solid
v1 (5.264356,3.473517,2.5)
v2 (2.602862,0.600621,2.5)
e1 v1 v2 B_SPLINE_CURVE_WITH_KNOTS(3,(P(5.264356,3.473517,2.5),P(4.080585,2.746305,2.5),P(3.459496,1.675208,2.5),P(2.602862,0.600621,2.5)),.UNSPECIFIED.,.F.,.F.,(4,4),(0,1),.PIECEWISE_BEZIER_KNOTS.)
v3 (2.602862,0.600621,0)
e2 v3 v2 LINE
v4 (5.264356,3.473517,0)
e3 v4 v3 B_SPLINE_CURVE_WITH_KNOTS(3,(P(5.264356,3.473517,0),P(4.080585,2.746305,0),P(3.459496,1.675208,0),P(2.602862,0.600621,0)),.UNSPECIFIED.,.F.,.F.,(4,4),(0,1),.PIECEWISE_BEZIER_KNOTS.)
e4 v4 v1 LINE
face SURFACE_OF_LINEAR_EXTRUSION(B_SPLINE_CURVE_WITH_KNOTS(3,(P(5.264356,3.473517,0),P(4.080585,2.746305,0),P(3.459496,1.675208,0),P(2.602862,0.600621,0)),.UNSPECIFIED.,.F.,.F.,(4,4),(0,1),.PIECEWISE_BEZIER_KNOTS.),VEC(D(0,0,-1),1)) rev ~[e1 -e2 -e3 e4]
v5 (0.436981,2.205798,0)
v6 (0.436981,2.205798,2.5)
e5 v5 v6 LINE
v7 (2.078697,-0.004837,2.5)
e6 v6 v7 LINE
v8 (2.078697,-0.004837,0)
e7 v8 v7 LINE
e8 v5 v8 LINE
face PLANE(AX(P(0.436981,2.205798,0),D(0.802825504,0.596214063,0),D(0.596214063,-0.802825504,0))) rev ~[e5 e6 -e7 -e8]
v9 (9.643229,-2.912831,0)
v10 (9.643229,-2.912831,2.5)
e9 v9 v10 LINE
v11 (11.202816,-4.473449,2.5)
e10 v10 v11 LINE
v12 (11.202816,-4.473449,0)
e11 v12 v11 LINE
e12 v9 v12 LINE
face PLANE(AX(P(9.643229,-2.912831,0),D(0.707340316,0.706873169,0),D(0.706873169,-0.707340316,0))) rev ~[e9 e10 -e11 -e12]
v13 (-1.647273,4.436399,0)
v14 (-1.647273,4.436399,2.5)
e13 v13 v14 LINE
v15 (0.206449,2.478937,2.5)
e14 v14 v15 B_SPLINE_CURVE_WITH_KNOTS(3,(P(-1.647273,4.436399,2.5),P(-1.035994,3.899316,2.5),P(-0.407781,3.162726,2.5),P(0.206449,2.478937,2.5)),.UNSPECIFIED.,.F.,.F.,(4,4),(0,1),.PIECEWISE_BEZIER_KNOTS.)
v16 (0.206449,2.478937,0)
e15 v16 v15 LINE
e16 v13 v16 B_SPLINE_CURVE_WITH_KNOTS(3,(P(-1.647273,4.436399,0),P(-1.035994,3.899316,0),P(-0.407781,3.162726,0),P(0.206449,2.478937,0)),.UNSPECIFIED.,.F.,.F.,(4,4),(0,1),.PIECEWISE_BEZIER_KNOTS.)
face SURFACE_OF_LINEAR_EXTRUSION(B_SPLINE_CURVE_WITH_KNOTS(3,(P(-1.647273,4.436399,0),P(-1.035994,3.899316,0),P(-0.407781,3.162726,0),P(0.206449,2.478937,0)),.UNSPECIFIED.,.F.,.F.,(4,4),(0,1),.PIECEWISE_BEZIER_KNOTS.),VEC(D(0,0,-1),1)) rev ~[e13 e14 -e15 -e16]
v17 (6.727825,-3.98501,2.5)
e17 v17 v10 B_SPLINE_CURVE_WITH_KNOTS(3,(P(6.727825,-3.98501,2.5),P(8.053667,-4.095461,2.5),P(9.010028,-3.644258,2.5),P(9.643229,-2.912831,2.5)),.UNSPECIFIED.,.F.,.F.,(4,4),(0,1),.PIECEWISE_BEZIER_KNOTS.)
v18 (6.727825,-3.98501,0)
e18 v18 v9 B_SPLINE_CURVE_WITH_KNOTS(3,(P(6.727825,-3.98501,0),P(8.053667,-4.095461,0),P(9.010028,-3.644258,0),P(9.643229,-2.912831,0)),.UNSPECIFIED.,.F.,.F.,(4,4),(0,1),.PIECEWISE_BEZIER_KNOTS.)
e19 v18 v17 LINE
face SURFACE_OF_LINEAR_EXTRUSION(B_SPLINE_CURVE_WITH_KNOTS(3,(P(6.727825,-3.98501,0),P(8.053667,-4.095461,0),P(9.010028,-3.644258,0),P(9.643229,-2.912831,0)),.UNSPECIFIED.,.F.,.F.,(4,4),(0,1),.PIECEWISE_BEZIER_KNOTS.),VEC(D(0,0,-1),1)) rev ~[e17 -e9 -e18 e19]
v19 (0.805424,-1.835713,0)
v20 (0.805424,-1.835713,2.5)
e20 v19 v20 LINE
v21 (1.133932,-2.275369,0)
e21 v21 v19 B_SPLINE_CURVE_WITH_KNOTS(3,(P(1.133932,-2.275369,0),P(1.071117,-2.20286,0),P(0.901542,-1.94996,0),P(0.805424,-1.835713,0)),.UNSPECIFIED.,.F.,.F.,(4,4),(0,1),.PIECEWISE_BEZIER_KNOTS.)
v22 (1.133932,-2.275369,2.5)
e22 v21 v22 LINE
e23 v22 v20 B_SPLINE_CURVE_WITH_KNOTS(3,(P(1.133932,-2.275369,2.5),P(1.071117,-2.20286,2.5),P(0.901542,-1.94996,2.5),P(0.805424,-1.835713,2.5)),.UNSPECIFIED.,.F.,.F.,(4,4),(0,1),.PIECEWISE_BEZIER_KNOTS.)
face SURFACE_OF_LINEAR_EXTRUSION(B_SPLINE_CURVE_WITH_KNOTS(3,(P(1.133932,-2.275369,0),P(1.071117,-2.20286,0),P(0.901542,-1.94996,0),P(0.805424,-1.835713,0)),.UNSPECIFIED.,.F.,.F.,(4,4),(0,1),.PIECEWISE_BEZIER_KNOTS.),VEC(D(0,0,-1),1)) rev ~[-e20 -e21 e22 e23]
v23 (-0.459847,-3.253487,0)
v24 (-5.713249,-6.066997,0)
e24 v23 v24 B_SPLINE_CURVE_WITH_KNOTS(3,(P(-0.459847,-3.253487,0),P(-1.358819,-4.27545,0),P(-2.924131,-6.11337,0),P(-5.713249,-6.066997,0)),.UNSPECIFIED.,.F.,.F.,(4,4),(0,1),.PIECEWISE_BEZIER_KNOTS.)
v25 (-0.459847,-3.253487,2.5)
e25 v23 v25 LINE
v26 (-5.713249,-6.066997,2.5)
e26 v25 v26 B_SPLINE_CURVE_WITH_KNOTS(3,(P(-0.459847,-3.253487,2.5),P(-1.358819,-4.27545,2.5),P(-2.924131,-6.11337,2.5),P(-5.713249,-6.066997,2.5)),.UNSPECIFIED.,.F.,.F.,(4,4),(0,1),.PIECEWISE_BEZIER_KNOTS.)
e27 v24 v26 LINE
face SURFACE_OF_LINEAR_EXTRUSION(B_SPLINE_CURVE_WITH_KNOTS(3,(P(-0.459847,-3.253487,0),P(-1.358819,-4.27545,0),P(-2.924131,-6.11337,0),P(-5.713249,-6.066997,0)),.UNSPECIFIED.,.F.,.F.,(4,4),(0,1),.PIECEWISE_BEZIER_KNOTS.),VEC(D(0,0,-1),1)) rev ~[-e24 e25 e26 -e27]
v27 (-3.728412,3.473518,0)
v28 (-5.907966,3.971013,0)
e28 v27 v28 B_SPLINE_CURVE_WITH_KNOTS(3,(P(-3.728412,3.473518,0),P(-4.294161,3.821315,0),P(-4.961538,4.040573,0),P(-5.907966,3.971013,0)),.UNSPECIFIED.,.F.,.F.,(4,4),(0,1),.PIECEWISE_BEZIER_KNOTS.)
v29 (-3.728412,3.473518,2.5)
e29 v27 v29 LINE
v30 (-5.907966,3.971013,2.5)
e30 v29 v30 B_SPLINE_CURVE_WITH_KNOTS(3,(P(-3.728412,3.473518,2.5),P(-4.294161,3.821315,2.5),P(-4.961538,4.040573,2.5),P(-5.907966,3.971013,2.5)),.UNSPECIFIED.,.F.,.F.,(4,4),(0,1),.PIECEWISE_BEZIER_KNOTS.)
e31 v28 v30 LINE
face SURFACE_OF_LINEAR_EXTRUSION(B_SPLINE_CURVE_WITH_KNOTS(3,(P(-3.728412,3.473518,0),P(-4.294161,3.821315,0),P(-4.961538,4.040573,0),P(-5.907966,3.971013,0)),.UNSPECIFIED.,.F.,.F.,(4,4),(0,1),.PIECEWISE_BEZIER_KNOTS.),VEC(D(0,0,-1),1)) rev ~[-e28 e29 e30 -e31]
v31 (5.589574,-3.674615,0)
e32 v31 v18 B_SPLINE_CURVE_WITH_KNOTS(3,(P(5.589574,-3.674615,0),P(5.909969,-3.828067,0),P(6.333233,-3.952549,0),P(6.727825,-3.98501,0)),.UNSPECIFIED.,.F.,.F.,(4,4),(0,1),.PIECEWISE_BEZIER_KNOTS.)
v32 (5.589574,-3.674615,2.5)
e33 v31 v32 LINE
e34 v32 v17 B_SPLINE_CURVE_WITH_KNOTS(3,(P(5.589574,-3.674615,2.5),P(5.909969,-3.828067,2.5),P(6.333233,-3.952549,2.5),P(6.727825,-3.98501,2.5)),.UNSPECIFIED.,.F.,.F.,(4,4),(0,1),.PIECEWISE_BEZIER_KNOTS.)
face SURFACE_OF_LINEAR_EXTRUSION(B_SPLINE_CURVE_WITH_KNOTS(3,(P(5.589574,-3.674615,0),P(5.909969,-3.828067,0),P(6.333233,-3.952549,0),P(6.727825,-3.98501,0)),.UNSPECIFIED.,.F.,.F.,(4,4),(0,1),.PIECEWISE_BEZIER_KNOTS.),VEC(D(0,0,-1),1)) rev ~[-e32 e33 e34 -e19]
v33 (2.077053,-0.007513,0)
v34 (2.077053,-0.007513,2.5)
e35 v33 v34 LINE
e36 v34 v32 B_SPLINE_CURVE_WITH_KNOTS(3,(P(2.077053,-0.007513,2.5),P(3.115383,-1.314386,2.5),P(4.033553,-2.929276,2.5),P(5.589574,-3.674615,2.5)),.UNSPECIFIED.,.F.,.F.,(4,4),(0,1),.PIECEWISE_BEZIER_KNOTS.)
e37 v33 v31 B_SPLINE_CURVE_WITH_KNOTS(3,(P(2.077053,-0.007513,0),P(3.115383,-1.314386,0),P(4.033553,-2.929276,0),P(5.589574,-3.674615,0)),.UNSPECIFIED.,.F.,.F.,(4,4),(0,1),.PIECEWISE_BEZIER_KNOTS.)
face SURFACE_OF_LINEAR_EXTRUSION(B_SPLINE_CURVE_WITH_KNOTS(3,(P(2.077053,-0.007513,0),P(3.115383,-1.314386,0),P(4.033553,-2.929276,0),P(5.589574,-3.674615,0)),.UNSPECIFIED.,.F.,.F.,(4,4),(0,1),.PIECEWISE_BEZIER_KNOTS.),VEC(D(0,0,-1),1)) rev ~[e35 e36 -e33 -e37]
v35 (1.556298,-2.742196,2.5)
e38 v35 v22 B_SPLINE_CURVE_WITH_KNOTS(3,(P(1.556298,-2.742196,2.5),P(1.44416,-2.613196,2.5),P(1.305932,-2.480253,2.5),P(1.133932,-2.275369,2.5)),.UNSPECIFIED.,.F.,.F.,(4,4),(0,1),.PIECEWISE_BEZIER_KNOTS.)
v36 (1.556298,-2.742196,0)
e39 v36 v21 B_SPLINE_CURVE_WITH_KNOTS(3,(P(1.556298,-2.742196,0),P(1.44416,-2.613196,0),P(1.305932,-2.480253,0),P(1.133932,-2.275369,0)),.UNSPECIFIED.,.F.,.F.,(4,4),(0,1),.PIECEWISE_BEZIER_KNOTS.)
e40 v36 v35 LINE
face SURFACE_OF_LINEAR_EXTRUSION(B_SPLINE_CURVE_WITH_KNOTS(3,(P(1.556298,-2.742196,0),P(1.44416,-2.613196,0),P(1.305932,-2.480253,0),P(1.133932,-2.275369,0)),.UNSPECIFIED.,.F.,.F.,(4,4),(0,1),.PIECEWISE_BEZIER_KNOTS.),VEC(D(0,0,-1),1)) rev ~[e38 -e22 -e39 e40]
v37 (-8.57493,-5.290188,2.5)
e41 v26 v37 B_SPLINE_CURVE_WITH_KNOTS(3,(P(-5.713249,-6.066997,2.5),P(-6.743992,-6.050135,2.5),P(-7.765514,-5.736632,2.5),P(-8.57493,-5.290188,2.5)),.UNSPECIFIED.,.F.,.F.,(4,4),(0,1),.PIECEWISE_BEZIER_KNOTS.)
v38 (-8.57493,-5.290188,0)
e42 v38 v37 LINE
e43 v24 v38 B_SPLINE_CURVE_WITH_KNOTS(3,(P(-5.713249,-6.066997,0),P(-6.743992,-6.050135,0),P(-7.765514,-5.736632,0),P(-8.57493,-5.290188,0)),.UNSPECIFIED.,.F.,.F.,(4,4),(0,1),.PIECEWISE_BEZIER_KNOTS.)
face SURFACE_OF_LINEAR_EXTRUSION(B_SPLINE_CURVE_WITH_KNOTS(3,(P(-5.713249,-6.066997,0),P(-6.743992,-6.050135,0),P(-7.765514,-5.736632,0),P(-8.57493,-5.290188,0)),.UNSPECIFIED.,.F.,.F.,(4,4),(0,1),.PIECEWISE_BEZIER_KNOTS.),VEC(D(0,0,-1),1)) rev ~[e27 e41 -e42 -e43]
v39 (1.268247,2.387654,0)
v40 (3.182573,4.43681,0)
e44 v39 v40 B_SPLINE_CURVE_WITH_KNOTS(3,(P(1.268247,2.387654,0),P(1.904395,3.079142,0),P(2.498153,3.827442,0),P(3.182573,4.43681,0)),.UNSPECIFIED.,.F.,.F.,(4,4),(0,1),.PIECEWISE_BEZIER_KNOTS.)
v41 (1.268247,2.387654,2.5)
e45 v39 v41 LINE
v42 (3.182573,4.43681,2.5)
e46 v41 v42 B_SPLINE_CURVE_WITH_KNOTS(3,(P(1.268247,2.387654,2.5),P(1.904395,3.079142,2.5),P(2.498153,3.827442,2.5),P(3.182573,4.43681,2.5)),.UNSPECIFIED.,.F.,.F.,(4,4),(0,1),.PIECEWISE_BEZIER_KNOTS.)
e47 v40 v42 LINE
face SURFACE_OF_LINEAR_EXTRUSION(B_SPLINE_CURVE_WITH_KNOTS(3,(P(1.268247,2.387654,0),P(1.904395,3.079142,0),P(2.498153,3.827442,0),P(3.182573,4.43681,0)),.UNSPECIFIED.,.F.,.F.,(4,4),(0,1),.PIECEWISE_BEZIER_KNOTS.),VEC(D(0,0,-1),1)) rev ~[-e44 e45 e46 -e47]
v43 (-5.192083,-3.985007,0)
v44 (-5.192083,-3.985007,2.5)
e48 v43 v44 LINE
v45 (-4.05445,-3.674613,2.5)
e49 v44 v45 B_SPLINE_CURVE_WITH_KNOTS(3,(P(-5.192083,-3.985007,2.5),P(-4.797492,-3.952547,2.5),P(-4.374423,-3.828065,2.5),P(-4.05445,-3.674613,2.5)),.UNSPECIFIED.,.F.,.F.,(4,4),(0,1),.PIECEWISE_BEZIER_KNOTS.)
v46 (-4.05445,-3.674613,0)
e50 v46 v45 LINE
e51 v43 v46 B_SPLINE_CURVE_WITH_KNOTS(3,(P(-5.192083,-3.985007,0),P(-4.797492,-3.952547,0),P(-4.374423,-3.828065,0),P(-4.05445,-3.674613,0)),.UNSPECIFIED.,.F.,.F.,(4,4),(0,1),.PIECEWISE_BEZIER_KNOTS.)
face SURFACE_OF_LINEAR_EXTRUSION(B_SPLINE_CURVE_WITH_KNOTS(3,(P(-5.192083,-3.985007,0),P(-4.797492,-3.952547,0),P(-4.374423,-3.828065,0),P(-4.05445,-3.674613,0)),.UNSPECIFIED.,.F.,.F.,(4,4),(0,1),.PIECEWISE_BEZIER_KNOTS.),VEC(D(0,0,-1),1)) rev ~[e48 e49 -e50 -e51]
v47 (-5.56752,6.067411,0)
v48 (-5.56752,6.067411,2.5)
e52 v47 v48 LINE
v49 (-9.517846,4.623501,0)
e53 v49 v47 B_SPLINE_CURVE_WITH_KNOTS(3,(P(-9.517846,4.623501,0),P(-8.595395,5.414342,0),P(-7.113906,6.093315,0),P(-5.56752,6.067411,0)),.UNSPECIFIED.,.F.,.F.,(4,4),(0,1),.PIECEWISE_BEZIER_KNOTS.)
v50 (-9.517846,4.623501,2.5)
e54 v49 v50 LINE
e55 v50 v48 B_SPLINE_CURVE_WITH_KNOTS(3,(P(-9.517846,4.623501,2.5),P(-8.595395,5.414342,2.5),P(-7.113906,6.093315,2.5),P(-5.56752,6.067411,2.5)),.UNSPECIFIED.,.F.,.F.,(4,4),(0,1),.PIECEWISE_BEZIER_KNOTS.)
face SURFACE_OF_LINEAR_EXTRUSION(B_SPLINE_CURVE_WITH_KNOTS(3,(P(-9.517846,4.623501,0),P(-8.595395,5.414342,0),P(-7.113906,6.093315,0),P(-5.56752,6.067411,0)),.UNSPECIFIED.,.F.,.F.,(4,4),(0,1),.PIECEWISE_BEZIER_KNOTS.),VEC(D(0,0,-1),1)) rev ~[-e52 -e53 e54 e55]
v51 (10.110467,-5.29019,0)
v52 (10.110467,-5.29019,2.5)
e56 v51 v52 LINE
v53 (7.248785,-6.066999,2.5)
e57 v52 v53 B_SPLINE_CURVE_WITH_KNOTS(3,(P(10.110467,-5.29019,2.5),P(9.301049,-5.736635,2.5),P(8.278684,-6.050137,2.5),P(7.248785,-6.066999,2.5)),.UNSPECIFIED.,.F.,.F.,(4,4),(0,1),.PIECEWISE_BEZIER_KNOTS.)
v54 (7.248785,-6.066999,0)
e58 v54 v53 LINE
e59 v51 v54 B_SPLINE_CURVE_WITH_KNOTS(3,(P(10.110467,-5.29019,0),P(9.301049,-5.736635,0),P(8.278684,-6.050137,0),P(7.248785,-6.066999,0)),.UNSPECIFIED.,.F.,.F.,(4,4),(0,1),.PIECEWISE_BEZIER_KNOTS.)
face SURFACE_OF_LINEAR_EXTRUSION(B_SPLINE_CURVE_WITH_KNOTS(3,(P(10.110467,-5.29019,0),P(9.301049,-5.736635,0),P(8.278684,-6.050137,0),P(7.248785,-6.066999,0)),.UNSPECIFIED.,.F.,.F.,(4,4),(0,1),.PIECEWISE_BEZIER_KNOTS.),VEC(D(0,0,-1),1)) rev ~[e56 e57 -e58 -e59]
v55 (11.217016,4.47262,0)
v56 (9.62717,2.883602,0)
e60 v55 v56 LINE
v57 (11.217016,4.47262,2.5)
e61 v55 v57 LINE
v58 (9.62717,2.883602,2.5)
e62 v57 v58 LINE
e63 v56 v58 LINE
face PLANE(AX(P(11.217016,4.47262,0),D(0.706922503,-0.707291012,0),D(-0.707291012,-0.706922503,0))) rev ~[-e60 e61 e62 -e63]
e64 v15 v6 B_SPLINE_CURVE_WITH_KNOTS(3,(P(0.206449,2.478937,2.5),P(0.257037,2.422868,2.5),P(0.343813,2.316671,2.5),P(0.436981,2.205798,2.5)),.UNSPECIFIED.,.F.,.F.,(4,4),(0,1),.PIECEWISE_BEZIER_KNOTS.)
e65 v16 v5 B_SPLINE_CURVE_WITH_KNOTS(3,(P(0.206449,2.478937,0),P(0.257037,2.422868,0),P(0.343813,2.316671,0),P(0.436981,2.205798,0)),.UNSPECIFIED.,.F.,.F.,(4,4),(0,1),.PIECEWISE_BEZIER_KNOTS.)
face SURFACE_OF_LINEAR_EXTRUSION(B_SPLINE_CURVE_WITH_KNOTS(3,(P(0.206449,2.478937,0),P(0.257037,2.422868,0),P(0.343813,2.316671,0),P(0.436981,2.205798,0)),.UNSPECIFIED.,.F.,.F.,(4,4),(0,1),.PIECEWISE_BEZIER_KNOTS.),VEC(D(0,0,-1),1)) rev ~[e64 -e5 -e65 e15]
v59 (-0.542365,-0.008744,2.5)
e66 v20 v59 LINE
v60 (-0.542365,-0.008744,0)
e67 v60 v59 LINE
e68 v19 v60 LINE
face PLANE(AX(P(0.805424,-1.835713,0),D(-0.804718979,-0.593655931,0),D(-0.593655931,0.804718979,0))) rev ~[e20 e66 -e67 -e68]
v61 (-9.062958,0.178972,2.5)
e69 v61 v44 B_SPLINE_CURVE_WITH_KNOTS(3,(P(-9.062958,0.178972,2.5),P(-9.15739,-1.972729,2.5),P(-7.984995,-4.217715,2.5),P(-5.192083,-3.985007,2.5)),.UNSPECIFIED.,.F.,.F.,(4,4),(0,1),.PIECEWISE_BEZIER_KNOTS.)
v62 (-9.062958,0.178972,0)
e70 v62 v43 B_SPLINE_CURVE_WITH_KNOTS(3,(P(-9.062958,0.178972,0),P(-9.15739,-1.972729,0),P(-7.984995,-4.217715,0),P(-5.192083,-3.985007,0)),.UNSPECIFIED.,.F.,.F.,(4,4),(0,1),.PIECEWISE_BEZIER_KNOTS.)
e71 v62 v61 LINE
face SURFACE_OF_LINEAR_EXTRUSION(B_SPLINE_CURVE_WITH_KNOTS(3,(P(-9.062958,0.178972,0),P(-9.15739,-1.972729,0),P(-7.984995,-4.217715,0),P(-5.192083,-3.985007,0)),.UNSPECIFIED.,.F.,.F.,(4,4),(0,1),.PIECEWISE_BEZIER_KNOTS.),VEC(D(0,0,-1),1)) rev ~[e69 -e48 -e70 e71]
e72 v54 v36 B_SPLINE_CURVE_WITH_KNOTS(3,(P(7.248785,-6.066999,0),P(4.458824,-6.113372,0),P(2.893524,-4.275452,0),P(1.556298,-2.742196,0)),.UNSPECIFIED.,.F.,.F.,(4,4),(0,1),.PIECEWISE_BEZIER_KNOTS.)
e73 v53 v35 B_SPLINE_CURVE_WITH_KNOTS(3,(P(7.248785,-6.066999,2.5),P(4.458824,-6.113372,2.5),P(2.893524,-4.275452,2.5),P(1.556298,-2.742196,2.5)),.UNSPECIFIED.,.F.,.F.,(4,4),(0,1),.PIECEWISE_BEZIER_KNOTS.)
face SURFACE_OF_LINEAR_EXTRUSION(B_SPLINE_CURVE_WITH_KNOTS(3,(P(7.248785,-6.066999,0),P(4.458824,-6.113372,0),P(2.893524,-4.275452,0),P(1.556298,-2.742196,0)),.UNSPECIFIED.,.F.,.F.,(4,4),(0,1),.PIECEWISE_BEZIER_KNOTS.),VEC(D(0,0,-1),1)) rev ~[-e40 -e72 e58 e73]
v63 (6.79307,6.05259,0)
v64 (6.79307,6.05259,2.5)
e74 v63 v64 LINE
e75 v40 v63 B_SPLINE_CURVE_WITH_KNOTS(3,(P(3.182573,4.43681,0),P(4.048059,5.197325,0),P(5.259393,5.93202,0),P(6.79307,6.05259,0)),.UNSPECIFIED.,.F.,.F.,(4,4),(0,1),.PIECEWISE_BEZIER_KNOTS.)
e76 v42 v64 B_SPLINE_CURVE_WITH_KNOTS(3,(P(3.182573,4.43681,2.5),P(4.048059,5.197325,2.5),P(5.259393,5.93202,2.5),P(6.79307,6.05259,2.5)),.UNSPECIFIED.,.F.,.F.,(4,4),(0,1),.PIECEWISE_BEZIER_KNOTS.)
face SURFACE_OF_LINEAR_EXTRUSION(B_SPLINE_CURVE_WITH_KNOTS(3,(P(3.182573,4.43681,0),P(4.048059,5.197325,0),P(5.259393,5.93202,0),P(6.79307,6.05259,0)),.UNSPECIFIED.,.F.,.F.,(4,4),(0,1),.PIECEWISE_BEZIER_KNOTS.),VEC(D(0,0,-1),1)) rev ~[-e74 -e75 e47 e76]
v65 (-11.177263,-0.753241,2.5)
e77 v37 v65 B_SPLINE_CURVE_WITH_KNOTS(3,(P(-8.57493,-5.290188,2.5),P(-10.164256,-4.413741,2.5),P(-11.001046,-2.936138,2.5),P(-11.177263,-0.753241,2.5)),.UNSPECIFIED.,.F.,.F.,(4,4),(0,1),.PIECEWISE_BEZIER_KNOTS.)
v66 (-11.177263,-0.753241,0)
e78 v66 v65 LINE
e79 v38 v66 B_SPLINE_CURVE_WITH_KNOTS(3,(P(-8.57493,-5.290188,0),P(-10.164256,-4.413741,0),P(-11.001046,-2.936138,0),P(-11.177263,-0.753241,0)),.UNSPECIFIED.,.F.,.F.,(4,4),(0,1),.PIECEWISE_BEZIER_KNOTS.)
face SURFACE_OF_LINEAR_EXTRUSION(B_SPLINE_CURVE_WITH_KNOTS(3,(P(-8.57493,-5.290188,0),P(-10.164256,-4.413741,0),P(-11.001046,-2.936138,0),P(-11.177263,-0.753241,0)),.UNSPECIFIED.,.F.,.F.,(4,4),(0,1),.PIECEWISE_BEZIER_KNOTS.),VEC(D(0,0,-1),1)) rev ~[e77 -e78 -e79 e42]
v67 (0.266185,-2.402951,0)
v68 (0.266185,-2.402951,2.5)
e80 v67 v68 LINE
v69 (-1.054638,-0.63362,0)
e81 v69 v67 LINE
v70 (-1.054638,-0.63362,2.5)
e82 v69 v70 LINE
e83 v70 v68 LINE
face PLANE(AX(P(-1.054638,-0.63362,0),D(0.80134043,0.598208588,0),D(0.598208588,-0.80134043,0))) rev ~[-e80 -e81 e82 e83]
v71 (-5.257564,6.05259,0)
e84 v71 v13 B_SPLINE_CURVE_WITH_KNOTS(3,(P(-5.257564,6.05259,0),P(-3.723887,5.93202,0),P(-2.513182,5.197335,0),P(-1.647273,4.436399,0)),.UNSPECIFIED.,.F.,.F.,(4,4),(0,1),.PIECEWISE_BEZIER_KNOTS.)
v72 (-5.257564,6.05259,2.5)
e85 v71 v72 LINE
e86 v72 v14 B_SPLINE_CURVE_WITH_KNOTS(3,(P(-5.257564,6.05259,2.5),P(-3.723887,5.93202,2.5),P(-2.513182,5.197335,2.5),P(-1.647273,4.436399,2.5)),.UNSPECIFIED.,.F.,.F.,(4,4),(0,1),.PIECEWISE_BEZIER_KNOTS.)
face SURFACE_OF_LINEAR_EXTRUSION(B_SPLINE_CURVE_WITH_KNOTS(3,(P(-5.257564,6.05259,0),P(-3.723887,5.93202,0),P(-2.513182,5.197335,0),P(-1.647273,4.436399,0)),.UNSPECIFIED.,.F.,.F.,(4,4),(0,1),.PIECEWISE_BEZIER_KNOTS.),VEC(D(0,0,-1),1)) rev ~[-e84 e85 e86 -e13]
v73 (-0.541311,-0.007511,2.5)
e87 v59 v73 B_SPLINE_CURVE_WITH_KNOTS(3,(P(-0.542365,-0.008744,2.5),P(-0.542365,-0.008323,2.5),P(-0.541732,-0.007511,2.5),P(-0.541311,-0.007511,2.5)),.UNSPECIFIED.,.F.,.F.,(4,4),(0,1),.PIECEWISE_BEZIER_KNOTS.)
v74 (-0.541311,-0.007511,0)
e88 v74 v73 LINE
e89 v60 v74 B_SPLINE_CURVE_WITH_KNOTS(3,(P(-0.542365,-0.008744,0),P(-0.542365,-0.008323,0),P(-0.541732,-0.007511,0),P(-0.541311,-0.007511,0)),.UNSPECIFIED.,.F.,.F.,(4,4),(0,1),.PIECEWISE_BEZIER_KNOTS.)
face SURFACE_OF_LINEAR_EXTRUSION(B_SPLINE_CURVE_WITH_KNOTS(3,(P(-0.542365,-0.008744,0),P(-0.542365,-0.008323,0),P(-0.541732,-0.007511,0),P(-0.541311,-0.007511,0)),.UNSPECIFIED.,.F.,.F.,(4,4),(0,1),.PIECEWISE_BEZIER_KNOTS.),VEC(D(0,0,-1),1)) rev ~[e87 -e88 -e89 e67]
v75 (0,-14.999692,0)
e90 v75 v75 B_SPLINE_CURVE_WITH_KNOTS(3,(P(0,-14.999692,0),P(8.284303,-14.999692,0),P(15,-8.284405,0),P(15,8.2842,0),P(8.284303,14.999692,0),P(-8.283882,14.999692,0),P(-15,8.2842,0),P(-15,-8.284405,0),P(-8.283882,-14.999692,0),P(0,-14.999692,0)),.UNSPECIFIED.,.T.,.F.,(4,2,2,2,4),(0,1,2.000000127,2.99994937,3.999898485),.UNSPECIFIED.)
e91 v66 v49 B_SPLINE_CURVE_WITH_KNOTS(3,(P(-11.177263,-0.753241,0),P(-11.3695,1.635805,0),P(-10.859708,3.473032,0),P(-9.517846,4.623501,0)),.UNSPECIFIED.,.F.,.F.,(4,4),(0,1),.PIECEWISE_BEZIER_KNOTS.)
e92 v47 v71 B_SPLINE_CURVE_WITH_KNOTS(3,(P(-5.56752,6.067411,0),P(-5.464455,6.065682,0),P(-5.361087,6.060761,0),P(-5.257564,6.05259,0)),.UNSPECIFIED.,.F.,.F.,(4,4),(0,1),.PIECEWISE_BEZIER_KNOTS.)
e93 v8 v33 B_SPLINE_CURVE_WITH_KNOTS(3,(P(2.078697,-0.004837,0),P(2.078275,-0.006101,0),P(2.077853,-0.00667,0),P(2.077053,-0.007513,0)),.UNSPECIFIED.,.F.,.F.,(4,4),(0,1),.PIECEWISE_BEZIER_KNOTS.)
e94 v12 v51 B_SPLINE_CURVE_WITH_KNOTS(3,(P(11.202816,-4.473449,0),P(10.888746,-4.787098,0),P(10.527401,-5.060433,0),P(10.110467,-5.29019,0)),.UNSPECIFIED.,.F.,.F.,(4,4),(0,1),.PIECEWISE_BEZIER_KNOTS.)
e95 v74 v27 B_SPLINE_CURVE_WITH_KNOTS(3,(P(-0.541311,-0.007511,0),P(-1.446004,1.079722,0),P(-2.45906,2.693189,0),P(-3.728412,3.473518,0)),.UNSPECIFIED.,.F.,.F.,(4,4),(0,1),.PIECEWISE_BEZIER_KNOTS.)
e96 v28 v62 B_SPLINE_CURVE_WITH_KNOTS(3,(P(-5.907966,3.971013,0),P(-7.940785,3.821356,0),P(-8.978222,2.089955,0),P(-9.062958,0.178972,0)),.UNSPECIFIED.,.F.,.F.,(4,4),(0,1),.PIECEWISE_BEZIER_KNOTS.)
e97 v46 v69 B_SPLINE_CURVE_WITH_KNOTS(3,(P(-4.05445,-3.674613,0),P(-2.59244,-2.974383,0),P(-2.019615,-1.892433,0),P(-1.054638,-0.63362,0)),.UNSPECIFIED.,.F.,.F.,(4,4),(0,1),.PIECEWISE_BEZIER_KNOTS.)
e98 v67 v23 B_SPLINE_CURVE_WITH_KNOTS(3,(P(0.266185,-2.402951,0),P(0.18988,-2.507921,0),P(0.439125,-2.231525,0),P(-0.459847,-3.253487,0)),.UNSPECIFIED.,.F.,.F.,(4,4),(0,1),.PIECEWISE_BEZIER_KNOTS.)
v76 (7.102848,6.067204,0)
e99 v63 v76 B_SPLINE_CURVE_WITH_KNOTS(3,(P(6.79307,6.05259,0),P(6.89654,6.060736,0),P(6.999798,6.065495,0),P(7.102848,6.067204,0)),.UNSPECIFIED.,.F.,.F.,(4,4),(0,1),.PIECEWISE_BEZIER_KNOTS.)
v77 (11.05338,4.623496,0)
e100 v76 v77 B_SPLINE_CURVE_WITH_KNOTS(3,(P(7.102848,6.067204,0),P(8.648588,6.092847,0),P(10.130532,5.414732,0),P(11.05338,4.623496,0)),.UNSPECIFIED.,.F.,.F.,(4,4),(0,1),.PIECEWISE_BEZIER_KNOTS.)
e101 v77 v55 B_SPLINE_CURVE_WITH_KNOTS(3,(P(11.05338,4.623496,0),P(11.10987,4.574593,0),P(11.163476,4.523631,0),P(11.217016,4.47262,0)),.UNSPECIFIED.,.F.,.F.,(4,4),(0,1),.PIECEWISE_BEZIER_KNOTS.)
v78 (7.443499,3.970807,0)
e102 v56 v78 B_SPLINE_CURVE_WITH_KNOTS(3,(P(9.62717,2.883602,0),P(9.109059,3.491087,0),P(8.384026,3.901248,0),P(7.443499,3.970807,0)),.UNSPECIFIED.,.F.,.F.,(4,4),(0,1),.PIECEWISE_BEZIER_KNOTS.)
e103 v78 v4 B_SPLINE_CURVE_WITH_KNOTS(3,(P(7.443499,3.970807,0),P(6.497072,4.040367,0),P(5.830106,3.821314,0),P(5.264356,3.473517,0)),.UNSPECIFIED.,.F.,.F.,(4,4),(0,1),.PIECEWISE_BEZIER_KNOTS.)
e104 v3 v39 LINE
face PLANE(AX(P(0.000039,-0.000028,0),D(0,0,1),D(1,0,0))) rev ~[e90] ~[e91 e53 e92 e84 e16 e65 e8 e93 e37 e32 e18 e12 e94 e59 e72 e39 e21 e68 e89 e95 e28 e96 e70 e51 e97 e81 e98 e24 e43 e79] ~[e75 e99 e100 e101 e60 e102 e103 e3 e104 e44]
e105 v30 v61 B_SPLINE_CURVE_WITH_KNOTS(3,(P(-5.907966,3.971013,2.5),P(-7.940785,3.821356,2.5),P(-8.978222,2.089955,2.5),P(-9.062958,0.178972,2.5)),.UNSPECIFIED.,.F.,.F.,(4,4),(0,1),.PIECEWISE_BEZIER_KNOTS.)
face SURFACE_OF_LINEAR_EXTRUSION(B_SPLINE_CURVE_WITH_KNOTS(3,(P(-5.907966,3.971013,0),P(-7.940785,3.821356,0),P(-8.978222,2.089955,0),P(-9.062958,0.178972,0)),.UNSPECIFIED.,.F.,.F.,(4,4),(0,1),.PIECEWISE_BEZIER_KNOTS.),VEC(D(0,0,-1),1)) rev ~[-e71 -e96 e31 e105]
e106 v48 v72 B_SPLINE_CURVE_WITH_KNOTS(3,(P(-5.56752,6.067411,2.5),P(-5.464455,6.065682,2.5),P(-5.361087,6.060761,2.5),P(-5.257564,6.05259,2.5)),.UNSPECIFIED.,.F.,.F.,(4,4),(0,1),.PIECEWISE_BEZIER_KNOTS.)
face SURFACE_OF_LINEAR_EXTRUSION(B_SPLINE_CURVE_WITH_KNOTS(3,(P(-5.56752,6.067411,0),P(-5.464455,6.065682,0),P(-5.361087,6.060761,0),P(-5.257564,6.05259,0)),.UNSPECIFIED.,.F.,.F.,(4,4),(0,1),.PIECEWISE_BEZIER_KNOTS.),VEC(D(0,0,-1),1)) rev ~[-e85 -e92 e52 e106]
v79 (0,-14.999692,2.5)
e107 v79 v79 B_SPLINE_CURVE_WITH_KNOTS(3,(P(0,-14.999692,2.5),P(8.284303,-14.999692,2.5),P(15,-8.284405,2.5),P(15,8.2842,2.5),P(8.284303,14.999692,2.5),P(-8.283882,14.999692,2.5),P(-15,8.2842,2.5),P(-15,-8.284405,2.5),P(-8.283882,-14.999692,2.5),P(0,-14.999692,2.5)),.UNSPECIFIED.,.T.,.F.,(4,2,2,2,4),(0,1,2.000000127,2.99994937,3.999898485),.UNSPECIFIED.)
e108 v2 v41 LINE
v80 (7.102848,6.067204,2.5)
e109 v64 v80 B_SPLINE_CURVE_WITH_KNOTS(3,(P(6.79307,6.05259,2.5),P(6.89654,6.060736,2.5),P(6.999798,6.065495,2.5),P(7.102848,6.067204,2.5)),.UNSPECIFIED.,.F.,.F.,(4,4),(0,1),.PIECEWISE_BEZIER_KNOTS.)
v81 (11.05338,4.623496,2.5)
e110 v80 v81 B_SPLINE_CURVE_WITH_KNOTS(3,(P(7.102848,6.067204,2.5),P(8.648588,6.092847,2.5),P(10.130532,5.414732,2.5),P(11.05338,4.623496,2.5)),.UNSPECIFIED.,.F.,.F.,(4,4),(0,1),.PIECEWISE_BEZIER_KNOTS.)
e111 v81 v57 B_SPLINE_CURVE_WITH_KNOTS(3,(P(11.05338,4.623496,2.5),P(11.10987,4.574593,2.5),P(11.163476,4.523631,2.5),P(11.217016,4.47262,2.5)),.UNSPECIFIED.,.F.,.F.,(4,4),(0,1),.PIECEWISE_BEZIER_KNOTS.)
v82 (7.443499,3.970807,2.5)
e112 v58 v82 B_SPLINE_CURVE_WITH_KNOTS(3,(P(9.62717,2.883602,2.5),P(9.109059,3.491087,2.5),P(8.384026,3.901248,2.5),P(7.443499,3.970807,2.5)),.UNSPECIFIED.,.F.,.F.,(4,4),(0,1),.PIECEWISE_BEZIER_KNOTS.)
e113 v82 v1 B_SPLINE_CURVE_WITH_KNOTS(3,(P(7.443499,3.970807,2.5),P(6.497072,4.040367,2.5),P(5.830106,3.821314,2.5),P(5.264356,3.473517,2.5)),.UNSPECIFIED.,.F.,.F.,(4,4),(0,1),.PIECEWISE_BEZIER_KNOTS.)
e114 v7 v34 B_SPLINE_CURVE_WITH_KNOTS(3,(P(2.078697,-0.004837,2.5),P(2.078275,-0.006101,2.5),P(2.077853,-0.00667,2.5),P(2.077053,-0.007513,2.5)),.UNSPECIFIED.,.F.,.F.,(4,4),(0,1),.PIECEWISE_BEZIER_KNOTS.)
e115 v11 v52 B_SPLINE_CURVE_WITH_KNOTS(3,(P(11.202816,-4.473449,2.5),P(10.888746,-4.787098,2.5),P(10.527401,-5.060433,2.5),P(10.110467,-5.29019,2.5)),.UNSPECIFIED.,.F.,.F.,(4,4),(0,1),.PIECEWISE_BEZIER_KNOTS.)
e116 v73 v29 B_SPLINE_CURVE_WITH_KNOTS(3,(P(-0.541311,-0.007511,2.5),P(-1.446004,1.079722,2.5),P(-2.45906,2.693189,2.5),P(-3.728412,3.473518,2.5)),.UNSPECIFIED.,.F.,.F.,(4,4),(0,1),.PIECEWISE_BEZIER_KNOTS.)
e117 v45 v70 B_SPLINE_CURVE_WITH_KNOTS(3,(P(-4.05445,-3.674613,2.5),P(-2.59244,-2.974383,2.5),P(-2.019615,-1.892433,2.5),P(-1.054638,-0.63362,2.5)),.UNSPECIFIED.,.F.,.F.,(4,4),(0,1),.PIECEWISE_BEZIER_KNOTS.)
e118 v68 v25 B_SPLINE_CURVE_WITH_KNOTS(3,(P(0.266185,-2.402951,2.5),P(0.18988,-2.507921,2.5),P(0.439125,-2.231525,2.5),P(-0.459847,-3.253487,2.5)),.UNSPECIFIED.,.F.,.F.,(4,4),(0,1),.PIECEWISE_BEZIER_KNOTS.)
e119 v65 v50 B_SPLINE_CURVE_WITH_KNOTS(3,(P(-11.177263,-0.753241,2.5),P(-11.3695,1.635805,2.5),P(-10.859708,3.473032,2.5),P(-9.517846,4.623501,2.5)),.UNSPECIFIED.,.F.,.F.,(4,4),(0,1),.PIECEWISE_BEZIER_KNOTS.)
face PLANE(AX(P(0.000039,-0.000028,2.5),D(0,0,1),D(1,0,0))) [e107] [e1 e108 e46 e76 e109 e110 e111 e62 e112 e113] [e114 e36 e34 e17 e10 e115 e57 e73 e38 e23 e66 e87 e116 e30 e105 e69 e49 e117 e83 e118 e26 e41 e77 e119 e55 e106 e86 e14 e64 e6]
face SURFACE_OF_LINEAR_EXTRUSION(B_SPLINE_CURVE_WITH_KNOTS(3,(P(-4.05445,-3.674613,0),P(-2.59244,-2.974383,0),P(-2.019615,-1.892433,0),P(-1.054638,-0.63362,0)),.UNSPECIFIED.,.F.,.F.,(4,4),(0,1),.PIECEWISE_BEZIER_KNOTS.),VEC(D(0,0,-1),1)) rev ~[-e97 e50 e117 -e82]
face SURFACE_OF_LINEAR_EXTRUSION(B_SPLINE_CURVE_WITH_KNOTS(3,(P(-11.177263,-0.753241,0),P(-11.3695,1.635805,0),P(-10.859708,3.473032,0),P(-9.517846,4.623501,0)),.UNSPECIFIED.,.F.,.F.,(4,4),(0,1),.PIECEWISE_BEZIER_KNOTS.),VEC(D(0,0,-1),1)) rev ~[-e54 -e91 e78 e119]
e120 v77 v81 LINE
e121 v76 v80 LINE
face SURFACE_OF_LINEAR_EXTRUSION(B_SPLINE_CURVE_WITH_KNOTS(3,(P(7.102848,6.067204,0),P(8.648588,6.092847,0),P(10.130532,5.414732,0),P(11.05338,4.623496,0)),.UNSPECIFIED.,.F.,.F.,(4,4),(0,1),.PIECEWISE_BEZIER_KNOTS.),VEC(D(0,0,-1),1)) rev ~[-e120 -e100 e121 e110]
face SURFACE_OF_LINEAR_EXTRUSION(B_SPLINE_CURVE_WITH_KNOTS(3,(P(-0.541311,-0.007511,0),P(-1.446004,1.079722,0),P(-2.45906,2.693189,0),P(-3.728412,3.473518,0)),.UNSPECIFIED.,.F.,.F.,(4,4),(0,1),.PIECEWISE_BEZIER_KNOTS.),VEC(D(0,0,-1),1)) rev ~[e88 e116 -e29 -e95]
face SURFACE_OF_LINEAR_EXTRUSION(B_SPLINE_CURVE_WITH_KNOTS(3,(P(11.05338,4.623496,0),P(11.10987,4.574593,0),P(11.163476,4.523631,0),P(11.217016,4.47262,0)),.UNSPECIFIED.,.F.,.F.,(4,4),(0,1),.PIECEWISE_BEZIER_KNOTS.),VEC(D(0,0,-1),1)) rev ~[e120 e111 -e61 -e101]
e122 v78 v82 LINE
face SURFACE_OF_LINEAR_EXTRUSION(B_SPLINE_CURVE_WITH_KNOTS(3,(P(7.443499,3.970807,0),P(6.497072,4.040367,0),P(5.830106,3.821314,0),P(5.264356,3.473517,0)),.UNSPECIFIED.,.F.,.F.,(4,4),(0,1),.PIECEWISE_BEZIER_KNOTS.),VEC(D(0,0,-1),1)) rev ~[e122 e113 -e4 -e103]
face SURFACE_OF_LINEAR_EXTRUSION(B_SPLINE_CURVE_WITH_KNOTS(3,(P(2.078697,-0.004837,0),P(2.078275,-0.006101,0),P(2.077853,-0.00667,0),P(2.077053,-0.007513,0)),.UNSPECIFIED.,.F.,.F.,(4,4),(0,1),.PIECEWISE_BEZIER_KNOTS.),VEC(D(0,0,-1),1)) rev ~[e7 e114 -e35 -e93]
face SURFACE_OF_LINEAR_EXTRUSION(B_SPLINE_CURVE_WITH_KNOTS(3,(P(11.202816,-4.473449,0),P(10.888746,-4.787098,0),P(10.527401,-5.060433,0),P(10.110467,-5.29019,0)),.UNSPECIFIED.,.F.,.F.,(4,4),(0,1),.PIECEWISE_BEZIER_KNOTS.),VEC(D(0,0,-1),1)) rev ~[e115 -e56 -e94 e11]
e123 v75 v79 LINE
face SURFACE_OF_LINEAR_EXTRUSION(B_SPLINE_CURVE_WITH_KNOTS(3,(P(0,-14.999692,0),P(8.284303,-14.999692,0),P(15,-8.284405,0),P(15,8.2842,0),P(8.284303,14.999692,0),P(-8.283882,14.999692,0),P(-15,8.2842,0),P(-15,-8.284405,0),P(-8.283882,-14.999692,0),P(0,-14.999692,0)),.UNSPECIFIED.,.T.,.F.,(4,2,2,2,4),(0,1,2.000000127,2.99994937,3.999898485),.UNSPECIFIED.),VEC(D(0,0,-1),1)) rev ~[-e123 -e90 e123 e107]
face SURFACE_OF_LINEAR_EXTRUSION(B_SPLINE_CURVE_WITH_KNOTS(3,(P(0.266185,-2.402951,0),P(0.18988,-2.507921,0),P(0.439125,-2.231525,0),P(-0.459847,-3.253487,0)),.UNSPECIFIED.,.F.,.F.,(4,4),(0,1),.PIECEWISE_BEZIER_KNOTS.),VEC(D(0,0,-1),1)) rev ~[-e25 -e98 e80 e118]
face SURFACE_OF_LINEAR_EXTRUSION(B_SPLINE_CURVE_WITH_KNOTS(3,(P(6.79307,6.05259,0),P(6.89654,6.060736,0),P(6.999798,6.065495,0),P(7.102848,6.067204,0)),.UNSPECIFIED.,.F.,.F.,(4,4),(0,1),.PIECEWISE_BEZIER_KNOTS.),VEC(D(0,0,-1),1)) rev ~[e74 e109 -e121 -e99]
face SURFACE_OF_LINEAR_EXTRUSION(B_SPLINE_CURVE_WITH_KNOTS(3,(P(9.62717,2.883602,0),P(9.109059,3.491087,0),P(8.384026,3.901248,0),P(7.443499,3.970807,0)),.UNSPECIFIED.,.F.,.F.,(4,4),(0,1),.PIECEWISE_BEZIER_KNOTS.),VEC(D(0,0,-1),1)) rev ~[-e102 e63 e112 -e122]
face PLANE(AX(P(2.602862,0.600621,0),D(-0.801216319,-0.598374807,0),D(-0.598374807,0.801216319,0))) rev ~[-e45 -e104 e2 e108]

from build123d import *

# Parameters (mm, degrees)
F1_DEPTH = 2.5


# Not quite as in the source:
# - ends of sketch curves that miss each other by under 0.0002 mm in the source are joined


with BuildPart() as f1:
    # F0 (on Top) → F1 (new body)
    with BuildSketch(Plane.XY):
        with BuildLine():
            add(Edge.make_bspline(
                [(15, -0.0001027513), (15, 8.2842004769), (8.2843032282, 14.9996917461), (0, 14.9996917461)],
                knots=[0, 0, 0, 0, 1, 1, 1, 1], degree=3))
            add(Edge.make_bspline(
                [(0, 14.9996917461), (-8.2838816845, 14.9996917461), (-15, 8.2842004769), (-15, -0.0001027513)],
                knots=[0, 0, 0, 0, 1, 1, 1, 1], degree=3))
            add(Edge.make_bspline(
                [(-15, -0.0001027513), (-15, -8.2844049257), (-8.2838816845, -14.9996917461), (0, -14.9996917461)],
                knots=[0, 0, 0, 0, 1, 1, 1, 1], degree=3))
            add(Edge.make_bspline(
                [(0, -14.9996917461), (8.2843032282, -14.9996917461), (15, -8.2844049257), (15, -0.0001027513)],
                knots=[0, 0, 0, 0, 1, 1, 1, 1], degree=3))
        make_face()
        with BuildLine():
            add(Edge.make_bspline(
                [(-9.5178456332, 4.6235008323), (-8.5953951404, 5.4143422042), (-7.1139059696, 6.0933153489), (-5.5675201382, 6.0674114853)],
                knots=[0, 0, 0, 0, 1, 1, 1, 1], degree=3))
            add(Edge.make_bspline(
                [(-5.5675201382, 6.0674114853), (-5.4644547985, 6.0656821021), (-5.3610870012, 6.0607605787), (-5.2575642865, 6.052590007)],
                knots=[0, 0, 0, 0, 1, 1, 1, 1], degree=3))
            add(Edge.make_bspline(
                [(-5.2575642865, 6.052590007), (-3.7238869453, 5.932020063), (-2.5131816731, 5.1973346421), (-1.6472728438, 4.4363986379)],
                knots=[0, 0, 0, 0, 1, 1, 1, 1], degree=3))
            add(Edge.make_bspline(
                [(-1.6472728438, 4.4363986379), (-1.0359943564, 3.8993160663), (-0.4077814026, 3.1627263216), (0.2064489449, 2.4789370395)],
                knots=[0, 0, 0, 0, 1, 1, 1, 1], degree=3))
            add(Edge.make_bspline(
                [(0.2064489449, 2.4789370395), (0.2570373568, 2.422867505), (0.343813192, 2.3166711491), (0.4369806844, 2.2057977652)],
                knots=[0, 0, 0, 0, 1, 1, 1, 1], degree=3))
            Line((0.4369806844, 2.2057977652), (2.0786965277, -0.0048366876))
            add(Edge.make_bspline(
                [(2.0786965277, -0.0048366876), (2.0782749839, -0.0061013189), (2.0778534402, -0.0066704029), (2.0770525071, -0.0075134905)],
                knots=[0, 0, 0, 0, 1, 1, 1, 1], degree=3))
            add(Edge.make_bspline(
                [(2.0770525071, -0.0075134905), (3.1153832697, -1.3143855389), (4.0335529857, -2.9292764454), (5.5895742535, -3.6746153308)],
                knots=[0, 0, 0, 0, 1, 1, 1, 1], degree=3))
            add(Edge.make_bspline(
                [(5.5895742535, -3.6746153308), (5.9099685823, -3.8280667413), (6.3332332869, -3.9525486114), (6.7278245855, -3.985009588)],
                knots=[0, 0, 0, 0, 1, 1, 1, 1], degree=3))
            add(Edge.make_bspline(
                [(6.7278245855, -3.985009588), (8.0536671566, -4.0954614281), (9.0100276828, -3.6442578575), (9.643228553, -2.9128309698)],
                knots=[0, 0, 0, 0, 1, 1, 1, 1], degree=3))
            Line((9.643228553, -2.9128309698), (11.2028160809, -4.4734491721))
            add(Edge.make_bspline(
                [(11.2028160809, -4.4734491721), (10.8887459621, -4.7870977471), (10.5274007654, -5.0604330392), (10.1104665941, -5.2901901921)],
                knots=[0, 0, 0, 0, 1, 1, 1, 1], degree=3))
            add(Edge.make_bspline(
                [(10.1104665941, -5.2901901921), (9.301048843, -5.7366345338), (8.27868405, -6.0501366223), (7.2487852163, -6.0669994263)],
                knots=[0, 0, 0, 0, 1, 1, 1, 1], degree=3))
            add(Edge.make_bspline(
                [(7.2487852163, -6.0669994263), (4.4588242386, -6.1133724006), (2.893523739, -4.2754521794), (1.5562984327, -2.7421963821)],
                knots=[0, 0, 0, 0, 1, 1, 1, 1], degree=3))
            add(Edge.make_bspline(
                [(1.5562984327, -2.7421963821), (1.4441604176, -2.613195563), (1.3059320058, -2.4802533099), (1.1339316163, -2.2753693461)],
                knots=[0, 0, 0, 0, 1, 1, 1, 1], degree=3))
            add(Edge.make_bspline(
                [(1.1339316163, -2.2753693461), (1.0711173818, -2.2028596053), (0.9015419227, -1.9499597004), (0.8054236241, -1.8357129127)],
                knots=[0, 0, 0, 0, 1, 1, 1, 1], degree=3))
            Line((0.8054236241, -1.8357129127), (-0.5423645148, -0.0087443982))
            add(Edge.make_bspline(
                [(-0.5423645148, -0.0087443982), (-0.5423645148, -0.0083228545), (-0.5417321992, -0.0075113827), (-0.5413106554, -0.0075113827)],
                knots=[0, 0, 0, 0, 1, 1, 1, 1], degree=3))
            add(Edge.make_bspline(
                [(-0.5413106554, -0.0075113827), (-1.4460036177, 1.0797216167), (-2.4590596708, 2.6931887593), (-3.7284122175, 3.4735178838)],
                knots=[0, 0, 0, 0, 1, 1, 1, 1], degree=3))
            add(Edge.make_bspline(
                [(-3.7284122175, 3.4735178838), (-4.2941608181, 3.8213146643), (-4.961538348, 4.04057327), (-5.9079662495, 3.9710132816)],
                knots=[0, 0, 0, 0, 1, 1, 1, 1], degree=3))
            add(Edge.make_bspline(
                [(-5.9079662495, 3.9710132816), (-7.9407851168, 3.8213557648), (-8.9782222067, 2.0899554344), (-9.0629577702, 0.1789721962)],
                knots=[0, 0, 0, 0, 1, 1, 1, 1], degree=3))
            add(Edge.make_bspline(
                [(-9.0629577702, 0.1789721962), (-9.1573898938, -1.9727293862), (-7.9849945178, -4.2177154394), (-5.1920827339, -3.9850074803)],
                knots=[0, 0, 0, 0, 1, 1, 1, 1], degree=3))
            add(Edge.make_bspline(
                [(-5.1920827339, -3.9850074803), (-4.7974924891, -3.9525465037), (-4.3744227485, -3.8280646336), (-4.0544499634, -3.6746132231)],
                knots=[0, 0, 0, 0, 1, 1, 1, 1], degree=3))
            add(Edge.make_bspline(
                [(-4.0544499634, -3.6746132231), (-2.5924403294, -2.9743826808), (-2.0196150631, -1.8924326784), (-1.0546381827, -0.6336197793)],
                knots=[0, 0, 0, 0, 1, 1, 1, 1], degree=3))
            Line((-1.0546381827, -0.6336197793), (0.2661848562, -2.4029506166))
            add(Edge.make_bspline(
                [(0.2661848562, -2.4029506166), (0.1898801678, -2.507921334), (0.4391252883, -2.2315245804), (-0.4598473253, -3.2534867991)],
                knots=[0, 0, 0, 0, 1, 1, 1, 1], degree=3))
            add(Edge.make_bspline(
                [(-0.4598473253, -3.2534867991), (-1.358818885, -4.2754500717), (-2.924130977, -6.1133702929), (-5.7132488672, -6.0669973186)],
                knots=[0, 0, 0, 0, 1, 1, 1, 1], degree=3))
            add(Edge.make_bspline(
                [(-5.7132488672, -6.0669973186), (-6.7439918423, -6.0501345146), (-7.7655135478, -5.7366324261), (-8.574930245, -5.2901880844)],
                knots=[0, 0, 0, 0, 1, 1, 1, 1], degree=3))
            add(Edge.make_bspline(
                [(-8.574930245, -5.2901880844), (-10.1642555769, -4.4137406612), (-11.0010462716, -2.9361381239), (-11.1772631525, -0.7532412499)],
                knots=[0, 0, 0, 0, 1, 1, 1, 1], degree=3))
            add(Edge.make_bspline(
                [(-11.1772631525, -0.7532412499), (-11.3694997498, 1.6358052729), (-10.8597079208, 3.4730320546), (-9.5178456332, 4.6235008323)],
                knots=[0, 0, 0, 0, 1, 1, 1, 1], degree=3))
        make_face(mode=Mode.SUBTRACT)
        with BuildLine():
            add(Edge.make_bspline(
                [(6.7930700736, 6.052590007), (6.8965400953, 6.06073634), (6.9997982913, 6.0654945151), (7.1028478231, 6.067203875)],
                knots=[0, 0, 0, 0, 1, 1, 1, 1], degree=3))
            add(Edge.make_bspline(
                [(7.1028478231, 6.067203875), (8.6485876387, 6.0928474353), (10.1305320767, 5.4147321321), (11.0533798746, 4.623495563)],
                knots=[0, 0, 0, 0, 1, 1, 1, 1], degree=3))
            add(Edge.make_bspline(
                [(11.0533798746, 4.623495563), (11.109869899, 4.5745933262), (11.1634755102, 4.5236307943), (11.2170157822, 4.4726197848)],
                knots=[0, 0, 0, 0, 1, 1, 1, 1], degree=3))
            Line((11.2170157822, 4.4726197848), (9.6271698438, 2.8836021799))
            add(Edge.make_bspline(
                [(9.6271698438, 2.8836021799), (9.1090588488, 3.4910867735), (8.384025726, 3.9012477906), (7.443499437, 3.9708067251)],
                knots=[0, 0, 0, 0, 1, 1, 1, 1], degree=3))
            add(Edge.make_bspline(
                [(7.443499437, 3.9708067251), (6.4970715356, 4.0403667136), (5.8301060646, 3.8213136104), (5.2643564102, 3.4735168299)],
                knots=[0, 0, 0, 0, 1, 1, 1, 1], degree=3))
            add(Edge.make_bspline(
                [(5.2643564102, 3.4735168299), (4.0805846222, 2.7463053798), (3.4594957578, 1.6752080213), (2.6028619448, 0.6006213344)],
                knots=[0, 0, 0, 0, 1, 1, 1, 1], degree=3))
            Line((2.6028619448, 0.6006213344), (1.2682470482, 2.3876538477))
            add(Edge.make_bspline(
                [(1.2682470482, 2.3876538477), (1.9043945093, 3.0791415725), (2.4981525845, 3.8274418027), (3.1825731284, 4.4368096431)],
                knots=[0, 0, 0, 0, 1, 1, 1, 1], degree=3))
            add(Edge.make_bspline(
                [(3.1825731284, 4.4368096431), (4.0480593601, 5.1973251574), (5.2593927325, 5.932020063), (6.7930700736, 6.052590007)],
                knots=[0, 0, 0, 0, 1, 1, 1, 1], degree=3))
        make_face(mode=Mode.SUBTRACT)
    extrude(amount=F1_DEPTH)


solid = f1.part
